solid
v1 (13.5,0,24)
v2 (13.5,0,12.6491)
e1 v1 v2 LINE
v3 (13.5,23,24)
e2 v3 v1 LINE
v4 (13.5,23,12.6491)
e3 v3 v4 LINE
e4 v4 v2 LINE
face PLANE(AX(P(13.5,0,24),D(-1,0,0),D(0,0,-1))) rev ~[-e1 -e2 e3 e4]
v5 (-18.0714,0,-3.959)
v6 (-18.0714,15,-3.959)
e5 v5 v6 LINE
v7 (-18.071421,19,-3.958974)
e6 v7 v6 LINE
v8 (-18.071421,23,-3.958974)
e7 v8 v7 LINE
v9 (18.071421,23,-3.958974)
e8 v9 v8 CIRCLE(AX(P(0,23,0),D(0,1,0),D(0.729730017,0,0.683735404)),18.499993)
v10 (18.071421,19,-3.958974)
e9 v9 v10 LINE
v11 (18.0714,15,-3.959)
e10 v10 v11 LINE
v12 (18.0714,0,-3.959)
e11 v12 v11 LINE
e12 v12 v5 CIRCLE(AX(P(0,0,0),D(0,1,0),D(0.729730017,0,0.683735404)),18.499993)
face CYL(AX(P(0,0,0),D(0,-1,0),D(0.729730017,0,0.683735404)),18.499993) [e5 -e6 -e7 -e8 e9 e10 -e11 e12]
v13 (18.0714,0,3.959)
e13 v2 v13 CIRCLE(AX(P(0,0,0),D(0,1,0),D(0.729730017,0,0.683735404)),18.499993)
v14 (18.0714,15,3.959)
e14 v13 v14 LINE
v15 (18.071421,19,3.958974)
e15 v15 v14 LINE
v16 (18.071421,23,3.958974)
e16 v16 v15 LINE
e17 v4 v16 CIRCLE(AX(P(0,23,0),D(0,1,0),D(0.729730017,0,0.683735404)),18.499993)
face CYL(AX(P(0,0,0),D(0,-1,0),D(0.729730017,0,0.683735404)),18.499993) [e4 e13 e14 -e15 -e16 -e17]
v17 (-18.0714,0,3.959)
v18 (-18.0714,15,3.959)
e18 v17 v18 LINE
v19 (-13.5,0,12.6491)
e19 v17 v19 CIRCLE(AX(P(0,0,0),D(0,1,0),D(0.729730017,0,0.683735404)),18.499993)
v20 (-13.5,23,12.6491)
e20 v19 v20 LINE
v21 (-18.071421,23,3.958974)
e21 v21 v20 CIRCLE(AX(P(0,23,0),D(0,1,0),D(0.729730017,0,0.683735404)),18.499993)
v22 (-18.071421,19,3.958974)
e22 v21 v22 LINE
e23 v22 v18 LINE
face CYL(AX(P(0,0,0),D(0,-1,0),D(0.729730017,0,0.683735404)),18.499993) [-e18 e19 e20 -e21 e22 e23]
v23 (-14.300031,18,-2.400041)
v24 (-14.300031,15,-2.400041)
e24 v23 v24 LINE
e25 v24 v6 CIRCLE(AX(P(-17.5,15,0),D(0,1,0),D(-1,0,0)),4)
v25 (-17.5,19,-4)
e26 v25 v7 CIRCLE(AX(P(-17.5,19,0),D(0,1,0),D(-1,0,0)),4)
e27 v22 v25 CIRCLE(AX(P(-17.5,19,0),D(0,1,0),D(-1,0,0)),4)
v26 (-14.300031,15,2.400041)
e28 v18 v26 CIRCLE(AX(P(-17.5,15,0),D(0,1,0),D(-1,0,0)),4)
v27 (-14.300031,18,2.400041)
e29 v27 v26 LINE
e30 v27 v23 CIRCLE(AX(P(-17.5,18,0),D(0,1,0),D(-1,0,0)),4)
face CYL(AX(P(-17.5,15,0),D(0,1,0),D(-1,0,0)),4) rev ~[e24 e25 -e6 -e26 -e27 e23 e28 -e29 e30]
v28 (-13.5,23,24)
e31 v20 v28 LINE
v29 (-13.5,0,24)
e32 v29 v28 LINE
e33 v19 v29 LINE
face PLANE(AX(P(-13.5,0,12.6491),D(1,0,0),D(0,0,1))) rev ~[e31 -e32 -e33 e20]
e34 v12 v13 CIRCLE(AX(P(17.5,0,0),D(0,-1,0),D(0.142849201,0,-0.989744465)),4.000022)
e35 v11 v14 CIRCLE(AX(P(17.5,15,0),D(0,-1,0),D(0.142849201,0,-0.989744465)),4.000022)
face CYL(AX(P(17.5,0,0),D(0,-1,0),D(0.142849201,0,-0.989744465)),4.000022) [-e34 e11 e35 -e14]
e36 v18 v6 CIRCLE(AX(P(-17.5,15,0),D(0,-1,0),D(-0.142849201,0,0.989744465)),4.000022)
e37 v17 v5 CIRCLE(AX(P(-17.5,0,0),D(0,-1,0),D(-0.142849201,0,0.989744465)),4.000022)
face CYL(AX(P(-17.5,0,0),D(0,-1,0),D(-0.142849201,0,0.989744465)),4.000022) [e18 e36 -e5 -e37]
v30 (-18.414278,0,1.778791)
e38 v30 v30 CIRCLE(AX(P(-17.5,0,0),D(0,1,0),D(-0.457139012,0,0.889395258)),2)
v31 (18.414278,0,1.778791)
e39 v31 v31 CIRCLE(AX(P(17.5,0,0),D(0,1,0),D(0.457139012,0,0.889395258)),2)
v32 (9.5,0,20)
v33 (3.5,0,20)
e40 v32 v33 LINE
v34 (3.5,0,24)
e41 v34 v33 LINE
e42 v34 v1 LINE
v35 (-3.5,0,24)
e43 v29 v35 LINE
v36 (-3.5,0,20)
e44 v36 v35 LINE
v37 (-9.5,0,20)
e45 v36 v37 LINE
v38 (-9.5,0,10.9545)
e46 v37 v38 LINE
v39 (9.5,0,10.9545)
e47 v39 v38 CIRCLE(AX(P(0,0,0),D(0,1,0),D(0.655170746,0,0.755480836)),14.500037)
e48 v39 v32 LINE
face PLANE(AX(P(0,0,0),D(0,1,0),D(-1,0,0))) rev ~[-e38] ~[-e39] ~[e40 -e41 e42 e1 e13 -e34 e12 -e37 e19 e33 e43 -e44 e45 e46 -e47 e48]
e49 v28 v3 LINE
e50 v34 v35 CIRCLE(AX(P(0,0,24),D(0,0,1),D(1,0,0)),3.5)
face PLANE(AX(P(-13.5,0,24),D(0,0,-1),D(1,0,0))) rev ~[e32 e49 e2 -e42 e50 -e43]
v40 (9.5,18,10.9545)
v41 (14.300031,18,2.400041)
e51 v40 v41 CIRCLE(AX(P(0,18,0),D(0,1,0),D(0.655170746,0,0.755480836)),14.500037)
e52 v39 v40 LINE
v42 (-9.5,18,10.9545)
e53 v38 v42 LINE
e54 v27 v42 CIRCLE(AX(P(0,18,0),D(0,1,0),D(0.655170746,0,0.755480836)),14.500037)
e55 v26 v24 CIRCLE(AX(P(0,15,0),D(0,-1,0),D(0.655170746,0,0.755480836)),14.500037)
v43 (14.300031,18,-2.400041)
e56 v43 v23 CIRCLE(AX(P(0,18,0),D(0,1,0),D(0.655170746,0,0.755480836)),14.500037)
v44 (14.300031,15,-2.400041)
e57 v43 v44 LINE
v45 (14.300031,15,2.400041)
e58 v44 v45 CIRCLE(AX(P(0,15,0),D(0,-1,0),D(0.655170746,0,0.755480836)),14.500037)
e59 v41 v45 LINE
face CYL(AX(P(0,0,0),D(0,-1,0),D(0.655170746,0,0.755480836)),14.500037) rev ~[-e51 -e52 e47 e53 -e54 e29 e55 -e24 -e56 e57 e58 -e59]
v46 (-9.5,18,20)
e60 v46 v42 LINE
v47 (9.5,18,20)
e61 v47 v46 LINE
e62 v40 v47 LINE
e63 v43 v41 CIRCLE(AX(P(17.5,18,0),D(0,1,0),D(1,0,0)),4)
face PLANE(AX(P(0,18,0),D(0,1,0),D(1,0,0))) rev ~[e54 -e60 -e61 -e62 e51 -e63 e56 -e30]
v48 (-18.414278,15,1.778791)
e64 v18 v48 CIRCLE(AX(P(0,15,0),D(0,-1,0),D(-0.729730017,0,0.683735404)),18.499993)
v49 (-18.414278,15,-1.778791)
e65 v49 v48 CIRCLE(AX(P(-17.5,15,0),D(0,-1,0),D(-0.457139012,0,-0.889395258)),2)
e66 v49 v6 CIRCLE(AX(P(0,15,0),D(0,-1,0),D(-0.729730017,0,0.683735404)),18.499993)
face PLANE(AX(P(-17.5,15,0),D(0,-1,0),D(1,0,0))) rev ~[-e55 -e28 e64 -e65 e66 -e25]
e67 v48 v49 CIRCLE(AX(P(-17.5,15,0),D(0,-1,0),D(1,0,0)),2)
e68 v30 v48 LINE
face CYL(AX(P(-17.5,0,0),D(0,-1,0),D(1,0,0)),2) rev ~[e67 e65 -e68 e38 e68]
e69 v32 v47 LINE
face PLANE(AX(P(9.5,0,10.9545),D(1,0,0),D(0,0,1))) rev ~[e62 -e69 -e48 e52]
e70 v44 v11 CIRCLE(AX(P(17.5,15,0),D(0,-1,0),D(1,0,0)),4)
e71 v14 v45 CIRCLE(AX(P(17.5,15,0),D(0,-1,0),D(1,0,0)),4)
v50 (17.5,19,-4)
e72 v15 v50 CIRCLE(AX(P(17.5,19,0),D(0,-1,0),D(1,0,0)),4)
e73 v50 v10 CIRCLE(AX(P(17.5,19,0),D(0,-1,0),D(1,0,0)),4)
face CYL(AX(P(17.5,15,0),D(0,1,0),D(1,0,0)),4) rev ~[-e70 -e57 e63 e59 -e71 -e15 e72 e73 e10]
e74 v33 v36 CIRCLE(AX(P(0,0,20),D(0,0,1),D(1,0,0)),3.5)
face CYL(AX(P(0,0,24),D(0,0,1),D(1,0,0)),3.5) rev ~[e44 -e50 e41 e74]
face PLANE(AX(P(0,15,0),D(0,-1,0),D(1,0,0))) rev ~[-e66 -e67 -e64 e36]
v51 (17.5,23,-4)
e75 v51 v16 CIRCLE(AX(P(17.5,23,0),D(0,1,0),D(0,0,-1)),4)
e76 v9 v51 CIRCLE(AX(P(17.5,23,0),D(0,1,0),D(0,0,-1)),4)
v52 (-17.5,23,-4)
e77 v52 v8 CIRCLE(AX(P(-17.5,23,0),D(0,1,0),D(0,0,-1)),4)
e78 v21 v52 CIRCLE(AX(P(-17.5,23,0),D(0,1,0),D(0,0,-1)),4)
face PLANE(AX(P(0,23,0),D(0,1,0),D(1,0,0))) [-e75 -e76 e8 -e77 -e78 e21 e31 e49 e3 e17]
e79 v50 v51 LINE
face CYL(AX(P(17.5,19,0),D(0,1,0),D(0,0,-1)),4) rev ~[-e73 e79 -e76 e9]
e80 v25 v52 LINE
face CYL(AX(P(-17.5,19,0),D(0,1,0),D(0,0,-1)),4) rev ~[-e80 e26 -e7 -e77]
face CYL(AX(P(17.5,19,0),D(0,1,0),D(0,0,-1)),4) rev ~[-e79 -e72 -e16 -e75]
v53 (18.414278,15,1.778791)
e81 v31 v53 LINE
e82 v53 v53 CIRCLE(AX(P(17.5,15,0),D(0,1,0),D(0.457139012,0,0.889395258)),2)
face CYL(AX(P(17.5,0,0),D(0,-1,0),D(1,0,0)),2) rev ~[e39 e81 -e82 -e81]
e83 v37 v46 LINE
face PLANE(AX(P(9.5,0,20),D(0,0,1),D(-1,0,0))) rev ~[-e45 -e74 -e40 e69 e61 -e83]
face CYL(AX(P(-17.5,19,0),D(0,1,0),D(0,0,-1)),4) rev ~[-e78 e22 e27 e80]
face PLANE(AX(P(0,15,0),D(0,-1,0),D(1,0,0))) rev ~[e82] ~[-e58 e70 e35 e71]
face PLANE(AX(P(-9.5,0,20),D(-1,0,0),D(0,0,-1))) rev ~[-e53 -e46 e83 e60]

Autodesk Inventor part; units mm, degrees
ref_plane "YZ Plane" through (0, 0, 0) normal (1, 0, 0) x (0, 1, 0)
ref_plane "XZ Plane" through (0, 0, 0) normal (0, 1, 0) x (-1, 0, 0)
ref_plane "XY Plane" through (0, 0, 0) normal (0, 0, 1) x (1, 0, 0)
sketch "Sketch1" plane through (0, 0, 0) normal (0, 1, 0) x (-1, 0, 0)
  arc A0 (-9.5, 10.9545) -> (9.5, 10.9545) centre (0, 0) ccw
  line L0 (-9.5, 10.9545) -> (-9.5, 20)
  line L1 (-9.5, 20) -> (9.5, 20)
  line L2 (9.5, 20) -> (9.5, 10.9545)
  line L3 (13.5, 12.6491) -> (13.5, 24)
  line L4 (13.5, 24) -> (-13.5, 24)
  line L5 (-13.5, 24) -> (-13.5, 12.6491)
  arc A1 (-13.5, 12.6491) -> (13.5, 12.6491) centre (0, 0) ccw
  point P0 (0, -20)
  point P1 (-9.5, 15)
  dimension "d0" = 0
  dimension "d1" = 29
  dimension "d6" = 20
  dimension "d7" = 19
  dimension "d8" = 4
extrude "Extrusion1" add sketch "Sketch1" along normal blind 18
sketch "Sketch2" plane through (0, 18, 0) normal (0, 1, 0) x (1, 0, 0)
  arc A0 (13.5, -12.6491) -> (-13.5, -12.6491) centre (0, 0) ccw
  line L0 (-13.5, -12.6491) -> (-13.5, -24) projected
  line L1 (-13.5, -24) -> (13.5, -24)
  line L2 (13.5, -24) -> (13.5, -12.6491)
  line L3 (-13.5, -12.6491) -> (-13.5, -24)
extrude "Extrusion2" add sketch "Sketch2" along normal blind 5
sketch "Sketch3" plane through (-13.5, 0, 24) normal (0, 0, 1) x (1, 0, 0)
  circle A0 centre (13.5, 0) radius 3.5
  dimension "d13" = 7
extrude "Extrusion3" cut sketch "Sketch3" against normal blind 5
sketch "Sketch7" plane through (0, 0, 0) normal (0, -1, 0) x (1, 0, 0)
  circle A0 centre (-17.5, 0) radius 2
  circle A1 centre (17.5, 0) radius 2
  arc A2 (-18.0714, 3.959) -> (-18.0714, -3.959) centre (-17.5, 0) ccw
  arc A3 (18.0714, -3.959) -> (18.0714, 3.959) centre (17.5, 0) ccw
  arc A4 (-13.5, 12.6491) -> (13.5, 12.6491) centre (0, 0) ccw projected
  point P0 (18.4143, 1.7788)
  point P1 (18.4143, -1.7788)
  point P2 (-18.4143, -1.7788)
  point P3 (-18.4143, 1.7788)
  dimension "d29" = 4
  dimension "d30" = 4
  dimension "d31" = 35
  dimension "d32" = 17.5
  dimension "d33" = 8
  dimension "d34" = 8
extrude "Extrusion6" add sketch "Sketch7" against normal blind 15 contours A0 A4 A2 | A1 A4 A3
extrude "Extrusion7" cut sketch "Sketch7" against normal blind 15 contours A0 A4 | A4 A1 picked at (-17.4936, 0) picked at (17.4985, 0.08)
sketch "Sketch8" plane through (0, 0, 0) normal (0, 0, 1) x (1, 0, 0)
  line L0 (17.5, 15) -> (21.5, 15)
  line L1 (21.5, 15) -> (21.5, 19)
  line L2 (21.5, 19) -> (17.5, 19)
  line L3 (17.5, 19) -> (17.5, 15)
  line L4 (18.0714, 0) -> (-18.0714, 0) projected
  line L5 (21.5, 15) -> (18.0714, 15) projected
  point P0 (0, 0)
  point P1 (0, 0)
  dimension "d39" = 17.5
  dimension "d40" = 0
  dimension "d41" = 4
  dimension "d42" = 4
revolve "Revolution1" cut sketch "Sketch8" angle 360 about axis through (17.5, 19, 0) along (0, -1, 0)
sketch "Sketch9" plane through (17.5, 19, 0) normal (0, -1, 0) x (1, 0, 0)
  arc A0 (0.5714, 3.959) -> (0.5714, -3.959) centre (0, 0) ccw projected
  point P0 (-17.5, 0)
hole "Hole1" at (17.5, 19, 0) direction (0, 1, 0) diameter 8 end through all
mirror "Mirror1" about plane through (0, 0, 0) normal (1, 0, 0) of "Revolution1"
sketch "Sketch10" plane through (-17.5, 19, 0) normal (0, -1, 0) x (1, 0, 0)
  arc A0 (3.2, -2.4) -> (3.2, 2.4) centre (0, 0) ccw projected
  point P0 (17.5, 0)
hole "Hole2" at (-17.5, 19, 0) direction (0, 1, 0) diameter 8 end through all
properties part number "motor_holder_v2"
